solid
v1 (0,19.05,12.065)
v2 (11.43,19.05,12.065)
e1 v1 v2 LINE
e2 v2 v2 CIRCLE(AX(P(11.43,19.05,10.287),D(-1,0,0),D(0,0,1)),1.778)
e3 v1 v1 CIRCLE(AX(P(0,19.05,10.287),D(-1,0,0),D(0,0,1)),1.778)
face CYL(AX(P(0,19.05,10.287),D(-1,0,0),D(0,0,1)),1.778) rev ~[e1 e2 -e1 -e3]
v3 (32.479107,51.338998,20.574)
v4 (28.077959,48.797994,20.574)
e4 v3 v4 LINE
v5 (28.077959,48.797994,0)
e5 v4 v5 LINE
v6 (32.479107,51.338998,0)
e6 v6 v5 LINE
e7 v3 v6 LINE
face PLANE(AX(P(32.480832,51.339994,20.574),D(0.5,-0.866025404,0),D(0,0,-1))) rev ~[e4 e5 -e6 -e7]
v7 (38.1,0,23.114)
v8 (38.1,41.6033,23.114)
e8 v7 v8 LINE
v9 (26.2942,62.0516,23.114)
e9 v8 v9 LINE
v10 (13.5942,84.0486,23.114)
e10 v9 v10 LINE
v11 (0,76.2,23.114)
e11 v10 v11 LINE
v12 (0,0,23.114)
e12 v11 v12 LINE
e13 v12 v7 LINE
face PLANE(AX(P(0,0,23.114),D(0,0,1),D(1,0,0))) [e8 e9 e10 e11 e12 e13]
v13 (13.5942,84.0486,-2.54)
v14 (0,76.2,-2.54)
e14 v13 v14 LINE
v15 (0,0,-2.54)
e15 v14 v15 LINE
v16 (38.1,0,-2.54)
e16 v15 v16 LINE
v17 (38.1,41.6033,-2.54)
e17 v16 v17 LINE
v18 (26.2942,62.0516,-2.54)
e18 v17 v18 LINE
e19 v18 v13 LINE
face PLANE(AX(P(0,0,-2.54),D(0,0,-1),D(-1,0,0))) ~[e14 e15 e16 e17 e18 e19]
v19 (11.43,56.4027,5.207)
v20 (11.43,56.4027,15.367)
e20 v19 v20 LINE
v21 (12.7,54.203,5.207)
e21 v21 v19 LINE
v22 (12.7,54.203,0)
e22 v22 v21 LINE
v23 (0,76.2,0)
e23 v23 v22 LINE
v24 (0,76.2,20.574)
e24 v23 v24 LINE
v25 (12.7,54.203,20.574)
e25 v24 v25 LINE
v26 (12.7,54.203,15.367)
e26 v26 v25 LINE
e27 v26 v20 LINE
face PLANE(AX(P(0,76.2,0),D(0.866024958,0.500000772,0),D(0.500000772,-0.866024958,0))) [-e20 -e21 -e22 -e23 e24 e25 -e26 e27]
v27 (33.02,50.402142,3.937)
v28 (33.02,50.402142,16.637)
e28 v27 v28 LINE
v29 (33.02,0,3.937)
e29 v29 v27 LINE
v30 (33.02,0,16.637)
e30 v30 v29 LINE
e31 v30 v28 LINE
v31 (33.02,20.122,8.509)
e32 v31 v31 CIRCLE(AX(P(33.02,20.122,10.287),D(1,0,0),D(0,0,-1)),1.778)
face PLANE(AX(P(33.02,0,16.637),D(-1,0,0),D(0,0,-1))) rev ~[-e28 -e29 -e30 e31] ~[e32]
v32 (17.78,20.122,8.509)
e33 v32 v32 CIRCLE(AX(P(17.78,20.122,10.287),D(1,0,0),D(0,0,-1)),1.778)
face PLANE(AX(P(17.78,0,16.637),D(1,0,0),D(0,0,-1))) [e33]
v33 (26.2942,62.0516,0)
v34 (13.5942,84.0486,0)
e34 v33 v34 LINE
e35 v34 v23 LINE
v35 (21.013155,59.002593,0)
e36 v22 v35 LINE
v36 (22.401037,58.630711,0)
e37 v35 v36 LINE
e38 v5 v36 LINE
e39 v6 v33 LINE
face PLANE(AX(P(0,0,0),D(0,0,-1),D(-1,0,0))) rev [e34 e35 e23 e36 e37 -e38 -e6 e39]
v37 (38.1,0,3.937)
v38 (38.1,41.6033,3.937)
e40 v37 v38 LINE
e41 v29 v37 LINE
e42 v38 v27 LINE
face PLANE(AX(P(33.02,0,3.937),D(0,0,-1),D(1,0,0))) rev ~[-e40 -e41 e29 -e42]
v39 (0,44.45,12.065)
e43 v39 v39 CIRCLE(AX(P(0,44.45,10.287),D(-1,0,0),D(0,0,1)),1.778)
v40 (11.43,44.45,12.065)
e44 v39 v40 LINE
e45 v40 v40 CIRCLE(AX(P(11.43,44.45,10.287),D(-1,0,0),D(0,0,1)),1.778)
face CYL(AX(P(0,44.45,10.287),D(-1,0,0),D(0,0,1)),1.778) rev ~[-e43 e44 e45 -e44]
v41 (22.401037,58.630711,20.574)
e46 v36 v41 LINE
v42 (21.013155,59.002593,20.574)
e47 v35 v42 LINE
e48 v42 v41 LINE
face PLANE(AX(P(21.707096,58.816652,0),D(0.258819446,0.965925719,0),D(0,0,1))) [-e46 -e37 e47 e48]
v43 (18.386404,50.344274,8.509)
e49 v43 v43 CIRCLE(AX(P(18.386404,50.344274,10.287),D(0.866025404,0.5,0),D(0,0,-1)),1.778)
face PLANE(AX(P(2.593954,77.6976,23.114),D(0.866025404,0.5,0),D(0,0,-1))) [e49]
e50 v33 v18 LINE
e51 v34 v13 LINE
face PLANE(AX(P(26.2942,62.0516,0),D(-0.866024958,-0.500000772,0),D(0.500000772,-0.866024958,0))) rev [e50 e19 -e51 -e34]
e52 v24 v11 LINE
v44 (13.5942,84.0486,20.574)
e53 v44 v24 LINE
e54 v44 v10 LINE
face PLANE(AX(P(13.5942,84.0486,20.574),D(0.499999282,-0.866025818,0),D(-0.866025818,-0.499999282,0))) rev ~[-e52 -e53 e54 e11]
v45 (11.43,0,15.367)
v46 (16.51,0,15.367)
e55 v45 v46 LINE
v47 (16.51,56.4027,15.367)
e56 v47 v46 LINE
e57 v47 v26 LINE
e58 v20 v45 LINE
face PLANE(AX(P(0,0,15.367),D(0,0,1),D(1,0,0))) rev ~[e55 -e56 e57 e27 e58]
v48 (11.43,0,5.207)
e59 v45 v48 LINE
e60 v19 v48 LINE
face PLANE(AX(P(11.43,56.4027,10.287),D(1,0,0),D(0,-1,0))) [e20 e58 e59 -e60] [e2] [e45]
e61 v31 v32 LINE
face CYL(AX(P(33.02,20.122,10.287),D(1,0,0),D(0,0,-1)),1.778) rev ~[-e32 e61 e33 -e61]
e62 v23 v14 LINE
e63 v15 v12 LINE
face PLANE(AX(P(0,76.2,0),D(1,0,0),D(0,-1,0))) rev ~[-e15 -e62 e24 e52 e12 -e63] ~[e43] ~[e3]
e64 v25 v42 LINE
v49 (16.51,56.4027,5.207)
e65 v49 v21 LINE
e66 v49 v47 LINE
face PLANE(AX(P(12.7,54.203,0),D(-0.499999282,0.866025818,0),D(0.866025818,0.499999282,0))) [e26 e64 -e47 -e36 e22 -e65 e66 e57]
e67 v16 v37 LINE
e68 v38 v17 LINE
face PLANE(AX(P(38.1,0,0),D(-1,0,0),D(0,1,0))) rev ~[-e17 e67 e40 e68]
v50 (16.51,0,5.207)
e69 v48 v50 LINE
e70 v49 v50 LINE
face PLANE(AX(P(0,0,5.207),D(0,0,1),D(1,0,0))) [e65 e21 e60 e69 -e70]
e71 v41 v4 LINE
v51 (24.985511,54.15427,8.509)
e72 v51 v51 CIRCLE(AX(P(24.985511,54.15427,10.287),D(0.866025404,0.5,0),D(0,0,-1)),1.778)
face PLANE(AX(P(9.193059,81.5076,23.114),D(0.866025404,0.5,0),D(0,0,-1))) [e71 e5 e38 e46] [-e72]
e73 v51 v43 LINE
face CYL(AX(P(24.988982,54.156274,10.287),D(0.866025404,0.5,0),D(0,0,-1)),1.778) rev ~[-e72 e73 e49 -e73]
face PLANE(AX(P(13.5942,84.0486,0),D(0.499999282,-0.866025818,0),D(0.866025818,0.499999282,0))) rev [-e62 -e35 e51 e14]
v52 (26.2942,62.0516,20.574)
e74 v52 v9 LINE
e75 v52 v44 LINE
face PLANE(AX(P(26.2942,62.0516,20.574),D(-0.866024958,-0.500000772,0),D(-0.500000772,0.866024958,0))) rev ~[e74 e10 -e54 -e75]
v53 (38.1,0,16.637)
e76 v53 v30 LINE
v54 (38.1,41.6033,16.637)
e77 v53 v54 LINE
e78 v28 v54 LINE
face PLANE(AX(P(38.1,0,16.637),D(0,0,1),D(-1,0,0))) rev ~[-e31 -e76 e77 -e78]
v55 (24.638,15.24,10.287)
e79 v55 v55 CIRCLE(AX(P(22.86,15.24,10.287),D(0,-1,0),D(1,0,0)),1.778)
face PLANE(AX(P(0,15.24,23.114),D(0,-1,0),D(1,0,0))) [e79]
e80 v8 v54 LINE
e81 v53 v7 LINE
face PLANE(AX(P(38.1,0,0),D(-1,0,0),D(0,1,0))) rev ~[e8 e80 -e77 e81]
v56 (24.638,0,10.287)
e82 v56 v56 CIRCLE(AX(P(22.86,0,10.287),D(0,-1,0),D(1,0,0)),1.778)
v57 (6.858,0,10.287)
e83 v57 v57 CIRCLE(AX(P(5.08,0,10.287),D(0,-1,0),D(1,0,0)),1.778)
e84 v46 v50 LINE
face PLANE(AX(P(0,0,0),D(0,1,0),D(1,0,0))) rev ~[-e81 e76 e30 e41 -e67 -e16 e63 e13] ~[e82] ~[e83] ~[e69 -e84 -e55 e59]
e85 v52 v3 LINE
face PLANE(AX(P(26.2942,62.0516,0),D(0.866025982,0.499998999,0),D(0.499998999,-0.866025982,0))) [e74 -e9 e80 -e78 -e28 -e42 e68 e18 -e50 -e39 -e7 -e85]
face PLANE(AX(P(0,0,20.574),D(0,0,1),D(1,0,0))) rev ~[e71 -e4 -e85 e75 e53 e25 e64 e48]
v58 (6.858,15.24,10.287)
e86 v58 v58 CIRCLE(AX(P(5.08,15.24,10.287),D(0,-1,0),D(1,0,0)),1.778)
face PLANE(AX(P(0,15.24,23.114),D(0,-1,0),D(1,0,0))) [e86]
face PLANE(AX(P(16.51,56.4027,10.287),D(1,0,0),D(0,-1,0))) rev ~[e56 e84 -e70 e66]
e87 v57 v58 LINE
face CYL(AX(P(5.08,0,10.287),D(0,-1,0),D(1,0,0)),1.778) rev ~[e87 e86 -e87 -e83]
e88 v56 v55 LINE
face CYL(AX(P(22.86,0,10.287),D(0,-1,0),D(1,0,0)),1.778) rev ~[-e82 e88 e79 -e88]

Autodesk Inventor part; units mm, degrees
ref_plane "YZ Plane" through (0, 0, 0) normal (1, 0, 0) x (0, 1, 0)
ref_plane "XZ Plane" through (0, 0, 0) normal (0, 1, 0) x (-1, 0, 0)
sketch "Sketch1" plane through (0, 0, 0) normal (0, 0, 1) x (1, 0, 0)
  line L0 (0, 0) -> (38.1, 0)
  line L1 (38.1, 0) -> (38.1, 41.6033)
  line L2 (0, 76.2) -> (0, 0)
  line L3 (0, 76.2) -> (13.5942, 84.0486)
  line L4 (0, 76.2) -> (12.7, 54.203)
  line L5 (12.7, 54.203) -> (26.2942, 62.0516)
  line L6 (26.2942, 62.0516) -> (13.5942, 84.0486)
  line L7 (26.2942, 62.0516) -> (38.1, 41.6033)
  dimension "d0" = 15.6972
  dimension "d1" = 25.4
  dimension "d2" = 38.1
  dimension "d3" = 76.2
  dimension "d4" = 120
extrude "Extrusion1" add sketch "Sketch1" along normal blind 20.574 contours L2 L4 L5 L7 L1 L0
sketch "Sketch2" plane through (0, 0, 20.574) normal (0, 0, 1) x (1, 0, 0)
  line L0 (0, 76.2) -> (0, 0) projected
  line L1 (0, 0) -> (38.1, 0) projected
  line L2 (38.1, 0) -> (38.1, 41.6033) projected
  line L3 (38.1, 41.6033) -> (26.2942, 62.0516) projected
  line L4 (26.2942, 62.0516) -> (12.7, 54.203) projected
  line L5 (12.7, 54.203) -> (0, 76.2) projected
  line L6 (26.2942, 62.0516) -> (13.5942, 84.0486)
  line L7 (13.5942, 84.0486) -> (0, 76.2)
  line L8 (38.1, 41.6033) -> (26.2942, 62.0516) projected
extrude "Extrusion2" add sketch "Sketch2" along normal blind 2.54
ref_plane "Work Plane1" through (0, 0, 10.287) normal (0, 0, -1) x (-1, 0, 0)
mirror "Mirror1" about plane through (0, 0, 10.287) normal (0, 0, -1) of "Extrusion2"
sketch "Sketch3" plane through (0, 0, 23.114) normal (0, -1, 0) x (1, 0, 0)
  line L0 (38.1, -25.654) -> (38.1, 0) projected
  line L1 (38.1, -6.477) -> (33.02, -6.477)
  line L2 (33.02, -6.477) -> (33.02, -19.177)
  line L3 (33.02, -19.177) -> (38.1, -19.177)
  line L4 (38.1, -19.177) -> (38.1, -6.477)
  point P0 (0, -23.114)
  point P1 (38.1, -12.827)
  point P2 (38.1, -19.177)
  dimension "d9" = 12.7
  dimension "d10" = 6.35
  dimension "d11" = 5.08
extrude "Extrusion3" cut sketch "Sketch3" against normal blind 65.0875
sketch "Sketch4" plane through (33.02, 0, 16.637) normal (1, 0, 0) x (0, 0, -1)
  circle A0 centre (6.35, 20.122) radius 1.778 projected
  point P0 (16.637, 0)
extrude "Extrusion4" cut sketch "Sketch4" against normal blind 15.24
sketch "Sketch5" plane through (13.5942, 84.0486, 23.114) normal (0.8660254, 0.5, 0) x (0, 0, -1)
  line L0 (23.114, -25.4) -> (2.54, -25.4) projected
  line L1 (23.114, -25.4) -> (2.54, -25.4)
  line L2 (2.54, -25.4) -> (2.54, -37.7698)
  line L3 (2.54, -37.7698) -> (23.114, -37.7698)
  line L4 (23.114, -37.7698) -> (23.114, -25.4)
  point P0 (23.114, -65.9911)
  dimension "d16" = 12.3698
extrude "Extrusion5" cut sketch "Sketch5" against normal blind 5.08
chamfer "Chamfer1" distance 1.016 angle 45 1 edges at (21.893, 59.5106, 10.287)
sketch "Sketch6" plane through (9.1948, 81.5086, 23.114) normal (0.8660254, 0.5, 0) x (0, 0, -1)
  line L0 (2.54, -39.2429) -> (2.54, -0.5012) projected
  line L1 (2.54, -25.4) -> (22.86, -25.4) projected
  line L2 (23.114, -37.7698) -> (2.54, -37.7698) projected
  line L3 (2.54, -37.7698) -> (2.54, 0) projected
  line L4 (2.54, -25.4) -> (2.54, -37.7698)
  circle A0 centre (12.827, -31.5849) radius 1.778
  line L5 (23.114, -37.7698) -> (2.54, -37.7698) projected
  point P0 (23.114, -65.9911)
  point P1 (2.54, -31.5849)
  point P2 (12.827, -37.7698)
  dimension "d22" = 3.556
extrude "Extrusion6" cut sketch "Sketch6" against normal blind 7.62
ref_plane "Work Plane2" through (0, 0, 10.287) normal (0, 0, 1) x (1, 0, 0)
sketch "Sketch7" plane through (0, 0, 10.287) normal (0, 0, 1) x (1, 0, 0)
  line L0 (21.0149, 59.0036) -> (12.7, 54.203) projected
  line L1 (16.51, 56.4027) -> (11.43, 56.4027)
  line L2 (12.7, 54.203) -> (0, 76.2) projected
  line L3 (16.51, 56.4027) -> (16.51, 0)
  line L4 (0, 0) -> (38.1, 0) projected
  line L5 (11.43, 56.4027) -> (11.43, 0)
  line L6 (11.43, 0) -> (16.51, 0)
  dimension "d25" = 5.08
extrude "Extrusion7" cut sketch "Sketch7" along normal mid plane 10.16 contours L3 L4 L5 L2 L0
sketch "Sketch8" plane through (0, 0, 23.114) normal (-1, 0, 0) x (0, 0, 1)
  circle A0 centre (-12.827, 44.45) radius 1.778 projected
  circle A1 centre (-12.827, 19.05) radius 1.778 projected
  point P0 (-23.114, 0)
extrude "Extrusion8" cut sketch "Sketch8" against normal blind 15.24
sketch "Sketch9" plane through (0, 0, 23.114) normal (0, -1, 0) x (1, 0, 0)
  circle A0 centre (5.08, -12.827) radius 1.778 projected
  circle A1 centre (22.86, -12.827) radius 1.778 projected
  point P0 (0, -23.114)
extrude "Extrusion9" cut sketch "Sketch9" against normal blind 15.24
equation "\"d10\" = 0.5 * d9"
properties part number "PALM 2"
